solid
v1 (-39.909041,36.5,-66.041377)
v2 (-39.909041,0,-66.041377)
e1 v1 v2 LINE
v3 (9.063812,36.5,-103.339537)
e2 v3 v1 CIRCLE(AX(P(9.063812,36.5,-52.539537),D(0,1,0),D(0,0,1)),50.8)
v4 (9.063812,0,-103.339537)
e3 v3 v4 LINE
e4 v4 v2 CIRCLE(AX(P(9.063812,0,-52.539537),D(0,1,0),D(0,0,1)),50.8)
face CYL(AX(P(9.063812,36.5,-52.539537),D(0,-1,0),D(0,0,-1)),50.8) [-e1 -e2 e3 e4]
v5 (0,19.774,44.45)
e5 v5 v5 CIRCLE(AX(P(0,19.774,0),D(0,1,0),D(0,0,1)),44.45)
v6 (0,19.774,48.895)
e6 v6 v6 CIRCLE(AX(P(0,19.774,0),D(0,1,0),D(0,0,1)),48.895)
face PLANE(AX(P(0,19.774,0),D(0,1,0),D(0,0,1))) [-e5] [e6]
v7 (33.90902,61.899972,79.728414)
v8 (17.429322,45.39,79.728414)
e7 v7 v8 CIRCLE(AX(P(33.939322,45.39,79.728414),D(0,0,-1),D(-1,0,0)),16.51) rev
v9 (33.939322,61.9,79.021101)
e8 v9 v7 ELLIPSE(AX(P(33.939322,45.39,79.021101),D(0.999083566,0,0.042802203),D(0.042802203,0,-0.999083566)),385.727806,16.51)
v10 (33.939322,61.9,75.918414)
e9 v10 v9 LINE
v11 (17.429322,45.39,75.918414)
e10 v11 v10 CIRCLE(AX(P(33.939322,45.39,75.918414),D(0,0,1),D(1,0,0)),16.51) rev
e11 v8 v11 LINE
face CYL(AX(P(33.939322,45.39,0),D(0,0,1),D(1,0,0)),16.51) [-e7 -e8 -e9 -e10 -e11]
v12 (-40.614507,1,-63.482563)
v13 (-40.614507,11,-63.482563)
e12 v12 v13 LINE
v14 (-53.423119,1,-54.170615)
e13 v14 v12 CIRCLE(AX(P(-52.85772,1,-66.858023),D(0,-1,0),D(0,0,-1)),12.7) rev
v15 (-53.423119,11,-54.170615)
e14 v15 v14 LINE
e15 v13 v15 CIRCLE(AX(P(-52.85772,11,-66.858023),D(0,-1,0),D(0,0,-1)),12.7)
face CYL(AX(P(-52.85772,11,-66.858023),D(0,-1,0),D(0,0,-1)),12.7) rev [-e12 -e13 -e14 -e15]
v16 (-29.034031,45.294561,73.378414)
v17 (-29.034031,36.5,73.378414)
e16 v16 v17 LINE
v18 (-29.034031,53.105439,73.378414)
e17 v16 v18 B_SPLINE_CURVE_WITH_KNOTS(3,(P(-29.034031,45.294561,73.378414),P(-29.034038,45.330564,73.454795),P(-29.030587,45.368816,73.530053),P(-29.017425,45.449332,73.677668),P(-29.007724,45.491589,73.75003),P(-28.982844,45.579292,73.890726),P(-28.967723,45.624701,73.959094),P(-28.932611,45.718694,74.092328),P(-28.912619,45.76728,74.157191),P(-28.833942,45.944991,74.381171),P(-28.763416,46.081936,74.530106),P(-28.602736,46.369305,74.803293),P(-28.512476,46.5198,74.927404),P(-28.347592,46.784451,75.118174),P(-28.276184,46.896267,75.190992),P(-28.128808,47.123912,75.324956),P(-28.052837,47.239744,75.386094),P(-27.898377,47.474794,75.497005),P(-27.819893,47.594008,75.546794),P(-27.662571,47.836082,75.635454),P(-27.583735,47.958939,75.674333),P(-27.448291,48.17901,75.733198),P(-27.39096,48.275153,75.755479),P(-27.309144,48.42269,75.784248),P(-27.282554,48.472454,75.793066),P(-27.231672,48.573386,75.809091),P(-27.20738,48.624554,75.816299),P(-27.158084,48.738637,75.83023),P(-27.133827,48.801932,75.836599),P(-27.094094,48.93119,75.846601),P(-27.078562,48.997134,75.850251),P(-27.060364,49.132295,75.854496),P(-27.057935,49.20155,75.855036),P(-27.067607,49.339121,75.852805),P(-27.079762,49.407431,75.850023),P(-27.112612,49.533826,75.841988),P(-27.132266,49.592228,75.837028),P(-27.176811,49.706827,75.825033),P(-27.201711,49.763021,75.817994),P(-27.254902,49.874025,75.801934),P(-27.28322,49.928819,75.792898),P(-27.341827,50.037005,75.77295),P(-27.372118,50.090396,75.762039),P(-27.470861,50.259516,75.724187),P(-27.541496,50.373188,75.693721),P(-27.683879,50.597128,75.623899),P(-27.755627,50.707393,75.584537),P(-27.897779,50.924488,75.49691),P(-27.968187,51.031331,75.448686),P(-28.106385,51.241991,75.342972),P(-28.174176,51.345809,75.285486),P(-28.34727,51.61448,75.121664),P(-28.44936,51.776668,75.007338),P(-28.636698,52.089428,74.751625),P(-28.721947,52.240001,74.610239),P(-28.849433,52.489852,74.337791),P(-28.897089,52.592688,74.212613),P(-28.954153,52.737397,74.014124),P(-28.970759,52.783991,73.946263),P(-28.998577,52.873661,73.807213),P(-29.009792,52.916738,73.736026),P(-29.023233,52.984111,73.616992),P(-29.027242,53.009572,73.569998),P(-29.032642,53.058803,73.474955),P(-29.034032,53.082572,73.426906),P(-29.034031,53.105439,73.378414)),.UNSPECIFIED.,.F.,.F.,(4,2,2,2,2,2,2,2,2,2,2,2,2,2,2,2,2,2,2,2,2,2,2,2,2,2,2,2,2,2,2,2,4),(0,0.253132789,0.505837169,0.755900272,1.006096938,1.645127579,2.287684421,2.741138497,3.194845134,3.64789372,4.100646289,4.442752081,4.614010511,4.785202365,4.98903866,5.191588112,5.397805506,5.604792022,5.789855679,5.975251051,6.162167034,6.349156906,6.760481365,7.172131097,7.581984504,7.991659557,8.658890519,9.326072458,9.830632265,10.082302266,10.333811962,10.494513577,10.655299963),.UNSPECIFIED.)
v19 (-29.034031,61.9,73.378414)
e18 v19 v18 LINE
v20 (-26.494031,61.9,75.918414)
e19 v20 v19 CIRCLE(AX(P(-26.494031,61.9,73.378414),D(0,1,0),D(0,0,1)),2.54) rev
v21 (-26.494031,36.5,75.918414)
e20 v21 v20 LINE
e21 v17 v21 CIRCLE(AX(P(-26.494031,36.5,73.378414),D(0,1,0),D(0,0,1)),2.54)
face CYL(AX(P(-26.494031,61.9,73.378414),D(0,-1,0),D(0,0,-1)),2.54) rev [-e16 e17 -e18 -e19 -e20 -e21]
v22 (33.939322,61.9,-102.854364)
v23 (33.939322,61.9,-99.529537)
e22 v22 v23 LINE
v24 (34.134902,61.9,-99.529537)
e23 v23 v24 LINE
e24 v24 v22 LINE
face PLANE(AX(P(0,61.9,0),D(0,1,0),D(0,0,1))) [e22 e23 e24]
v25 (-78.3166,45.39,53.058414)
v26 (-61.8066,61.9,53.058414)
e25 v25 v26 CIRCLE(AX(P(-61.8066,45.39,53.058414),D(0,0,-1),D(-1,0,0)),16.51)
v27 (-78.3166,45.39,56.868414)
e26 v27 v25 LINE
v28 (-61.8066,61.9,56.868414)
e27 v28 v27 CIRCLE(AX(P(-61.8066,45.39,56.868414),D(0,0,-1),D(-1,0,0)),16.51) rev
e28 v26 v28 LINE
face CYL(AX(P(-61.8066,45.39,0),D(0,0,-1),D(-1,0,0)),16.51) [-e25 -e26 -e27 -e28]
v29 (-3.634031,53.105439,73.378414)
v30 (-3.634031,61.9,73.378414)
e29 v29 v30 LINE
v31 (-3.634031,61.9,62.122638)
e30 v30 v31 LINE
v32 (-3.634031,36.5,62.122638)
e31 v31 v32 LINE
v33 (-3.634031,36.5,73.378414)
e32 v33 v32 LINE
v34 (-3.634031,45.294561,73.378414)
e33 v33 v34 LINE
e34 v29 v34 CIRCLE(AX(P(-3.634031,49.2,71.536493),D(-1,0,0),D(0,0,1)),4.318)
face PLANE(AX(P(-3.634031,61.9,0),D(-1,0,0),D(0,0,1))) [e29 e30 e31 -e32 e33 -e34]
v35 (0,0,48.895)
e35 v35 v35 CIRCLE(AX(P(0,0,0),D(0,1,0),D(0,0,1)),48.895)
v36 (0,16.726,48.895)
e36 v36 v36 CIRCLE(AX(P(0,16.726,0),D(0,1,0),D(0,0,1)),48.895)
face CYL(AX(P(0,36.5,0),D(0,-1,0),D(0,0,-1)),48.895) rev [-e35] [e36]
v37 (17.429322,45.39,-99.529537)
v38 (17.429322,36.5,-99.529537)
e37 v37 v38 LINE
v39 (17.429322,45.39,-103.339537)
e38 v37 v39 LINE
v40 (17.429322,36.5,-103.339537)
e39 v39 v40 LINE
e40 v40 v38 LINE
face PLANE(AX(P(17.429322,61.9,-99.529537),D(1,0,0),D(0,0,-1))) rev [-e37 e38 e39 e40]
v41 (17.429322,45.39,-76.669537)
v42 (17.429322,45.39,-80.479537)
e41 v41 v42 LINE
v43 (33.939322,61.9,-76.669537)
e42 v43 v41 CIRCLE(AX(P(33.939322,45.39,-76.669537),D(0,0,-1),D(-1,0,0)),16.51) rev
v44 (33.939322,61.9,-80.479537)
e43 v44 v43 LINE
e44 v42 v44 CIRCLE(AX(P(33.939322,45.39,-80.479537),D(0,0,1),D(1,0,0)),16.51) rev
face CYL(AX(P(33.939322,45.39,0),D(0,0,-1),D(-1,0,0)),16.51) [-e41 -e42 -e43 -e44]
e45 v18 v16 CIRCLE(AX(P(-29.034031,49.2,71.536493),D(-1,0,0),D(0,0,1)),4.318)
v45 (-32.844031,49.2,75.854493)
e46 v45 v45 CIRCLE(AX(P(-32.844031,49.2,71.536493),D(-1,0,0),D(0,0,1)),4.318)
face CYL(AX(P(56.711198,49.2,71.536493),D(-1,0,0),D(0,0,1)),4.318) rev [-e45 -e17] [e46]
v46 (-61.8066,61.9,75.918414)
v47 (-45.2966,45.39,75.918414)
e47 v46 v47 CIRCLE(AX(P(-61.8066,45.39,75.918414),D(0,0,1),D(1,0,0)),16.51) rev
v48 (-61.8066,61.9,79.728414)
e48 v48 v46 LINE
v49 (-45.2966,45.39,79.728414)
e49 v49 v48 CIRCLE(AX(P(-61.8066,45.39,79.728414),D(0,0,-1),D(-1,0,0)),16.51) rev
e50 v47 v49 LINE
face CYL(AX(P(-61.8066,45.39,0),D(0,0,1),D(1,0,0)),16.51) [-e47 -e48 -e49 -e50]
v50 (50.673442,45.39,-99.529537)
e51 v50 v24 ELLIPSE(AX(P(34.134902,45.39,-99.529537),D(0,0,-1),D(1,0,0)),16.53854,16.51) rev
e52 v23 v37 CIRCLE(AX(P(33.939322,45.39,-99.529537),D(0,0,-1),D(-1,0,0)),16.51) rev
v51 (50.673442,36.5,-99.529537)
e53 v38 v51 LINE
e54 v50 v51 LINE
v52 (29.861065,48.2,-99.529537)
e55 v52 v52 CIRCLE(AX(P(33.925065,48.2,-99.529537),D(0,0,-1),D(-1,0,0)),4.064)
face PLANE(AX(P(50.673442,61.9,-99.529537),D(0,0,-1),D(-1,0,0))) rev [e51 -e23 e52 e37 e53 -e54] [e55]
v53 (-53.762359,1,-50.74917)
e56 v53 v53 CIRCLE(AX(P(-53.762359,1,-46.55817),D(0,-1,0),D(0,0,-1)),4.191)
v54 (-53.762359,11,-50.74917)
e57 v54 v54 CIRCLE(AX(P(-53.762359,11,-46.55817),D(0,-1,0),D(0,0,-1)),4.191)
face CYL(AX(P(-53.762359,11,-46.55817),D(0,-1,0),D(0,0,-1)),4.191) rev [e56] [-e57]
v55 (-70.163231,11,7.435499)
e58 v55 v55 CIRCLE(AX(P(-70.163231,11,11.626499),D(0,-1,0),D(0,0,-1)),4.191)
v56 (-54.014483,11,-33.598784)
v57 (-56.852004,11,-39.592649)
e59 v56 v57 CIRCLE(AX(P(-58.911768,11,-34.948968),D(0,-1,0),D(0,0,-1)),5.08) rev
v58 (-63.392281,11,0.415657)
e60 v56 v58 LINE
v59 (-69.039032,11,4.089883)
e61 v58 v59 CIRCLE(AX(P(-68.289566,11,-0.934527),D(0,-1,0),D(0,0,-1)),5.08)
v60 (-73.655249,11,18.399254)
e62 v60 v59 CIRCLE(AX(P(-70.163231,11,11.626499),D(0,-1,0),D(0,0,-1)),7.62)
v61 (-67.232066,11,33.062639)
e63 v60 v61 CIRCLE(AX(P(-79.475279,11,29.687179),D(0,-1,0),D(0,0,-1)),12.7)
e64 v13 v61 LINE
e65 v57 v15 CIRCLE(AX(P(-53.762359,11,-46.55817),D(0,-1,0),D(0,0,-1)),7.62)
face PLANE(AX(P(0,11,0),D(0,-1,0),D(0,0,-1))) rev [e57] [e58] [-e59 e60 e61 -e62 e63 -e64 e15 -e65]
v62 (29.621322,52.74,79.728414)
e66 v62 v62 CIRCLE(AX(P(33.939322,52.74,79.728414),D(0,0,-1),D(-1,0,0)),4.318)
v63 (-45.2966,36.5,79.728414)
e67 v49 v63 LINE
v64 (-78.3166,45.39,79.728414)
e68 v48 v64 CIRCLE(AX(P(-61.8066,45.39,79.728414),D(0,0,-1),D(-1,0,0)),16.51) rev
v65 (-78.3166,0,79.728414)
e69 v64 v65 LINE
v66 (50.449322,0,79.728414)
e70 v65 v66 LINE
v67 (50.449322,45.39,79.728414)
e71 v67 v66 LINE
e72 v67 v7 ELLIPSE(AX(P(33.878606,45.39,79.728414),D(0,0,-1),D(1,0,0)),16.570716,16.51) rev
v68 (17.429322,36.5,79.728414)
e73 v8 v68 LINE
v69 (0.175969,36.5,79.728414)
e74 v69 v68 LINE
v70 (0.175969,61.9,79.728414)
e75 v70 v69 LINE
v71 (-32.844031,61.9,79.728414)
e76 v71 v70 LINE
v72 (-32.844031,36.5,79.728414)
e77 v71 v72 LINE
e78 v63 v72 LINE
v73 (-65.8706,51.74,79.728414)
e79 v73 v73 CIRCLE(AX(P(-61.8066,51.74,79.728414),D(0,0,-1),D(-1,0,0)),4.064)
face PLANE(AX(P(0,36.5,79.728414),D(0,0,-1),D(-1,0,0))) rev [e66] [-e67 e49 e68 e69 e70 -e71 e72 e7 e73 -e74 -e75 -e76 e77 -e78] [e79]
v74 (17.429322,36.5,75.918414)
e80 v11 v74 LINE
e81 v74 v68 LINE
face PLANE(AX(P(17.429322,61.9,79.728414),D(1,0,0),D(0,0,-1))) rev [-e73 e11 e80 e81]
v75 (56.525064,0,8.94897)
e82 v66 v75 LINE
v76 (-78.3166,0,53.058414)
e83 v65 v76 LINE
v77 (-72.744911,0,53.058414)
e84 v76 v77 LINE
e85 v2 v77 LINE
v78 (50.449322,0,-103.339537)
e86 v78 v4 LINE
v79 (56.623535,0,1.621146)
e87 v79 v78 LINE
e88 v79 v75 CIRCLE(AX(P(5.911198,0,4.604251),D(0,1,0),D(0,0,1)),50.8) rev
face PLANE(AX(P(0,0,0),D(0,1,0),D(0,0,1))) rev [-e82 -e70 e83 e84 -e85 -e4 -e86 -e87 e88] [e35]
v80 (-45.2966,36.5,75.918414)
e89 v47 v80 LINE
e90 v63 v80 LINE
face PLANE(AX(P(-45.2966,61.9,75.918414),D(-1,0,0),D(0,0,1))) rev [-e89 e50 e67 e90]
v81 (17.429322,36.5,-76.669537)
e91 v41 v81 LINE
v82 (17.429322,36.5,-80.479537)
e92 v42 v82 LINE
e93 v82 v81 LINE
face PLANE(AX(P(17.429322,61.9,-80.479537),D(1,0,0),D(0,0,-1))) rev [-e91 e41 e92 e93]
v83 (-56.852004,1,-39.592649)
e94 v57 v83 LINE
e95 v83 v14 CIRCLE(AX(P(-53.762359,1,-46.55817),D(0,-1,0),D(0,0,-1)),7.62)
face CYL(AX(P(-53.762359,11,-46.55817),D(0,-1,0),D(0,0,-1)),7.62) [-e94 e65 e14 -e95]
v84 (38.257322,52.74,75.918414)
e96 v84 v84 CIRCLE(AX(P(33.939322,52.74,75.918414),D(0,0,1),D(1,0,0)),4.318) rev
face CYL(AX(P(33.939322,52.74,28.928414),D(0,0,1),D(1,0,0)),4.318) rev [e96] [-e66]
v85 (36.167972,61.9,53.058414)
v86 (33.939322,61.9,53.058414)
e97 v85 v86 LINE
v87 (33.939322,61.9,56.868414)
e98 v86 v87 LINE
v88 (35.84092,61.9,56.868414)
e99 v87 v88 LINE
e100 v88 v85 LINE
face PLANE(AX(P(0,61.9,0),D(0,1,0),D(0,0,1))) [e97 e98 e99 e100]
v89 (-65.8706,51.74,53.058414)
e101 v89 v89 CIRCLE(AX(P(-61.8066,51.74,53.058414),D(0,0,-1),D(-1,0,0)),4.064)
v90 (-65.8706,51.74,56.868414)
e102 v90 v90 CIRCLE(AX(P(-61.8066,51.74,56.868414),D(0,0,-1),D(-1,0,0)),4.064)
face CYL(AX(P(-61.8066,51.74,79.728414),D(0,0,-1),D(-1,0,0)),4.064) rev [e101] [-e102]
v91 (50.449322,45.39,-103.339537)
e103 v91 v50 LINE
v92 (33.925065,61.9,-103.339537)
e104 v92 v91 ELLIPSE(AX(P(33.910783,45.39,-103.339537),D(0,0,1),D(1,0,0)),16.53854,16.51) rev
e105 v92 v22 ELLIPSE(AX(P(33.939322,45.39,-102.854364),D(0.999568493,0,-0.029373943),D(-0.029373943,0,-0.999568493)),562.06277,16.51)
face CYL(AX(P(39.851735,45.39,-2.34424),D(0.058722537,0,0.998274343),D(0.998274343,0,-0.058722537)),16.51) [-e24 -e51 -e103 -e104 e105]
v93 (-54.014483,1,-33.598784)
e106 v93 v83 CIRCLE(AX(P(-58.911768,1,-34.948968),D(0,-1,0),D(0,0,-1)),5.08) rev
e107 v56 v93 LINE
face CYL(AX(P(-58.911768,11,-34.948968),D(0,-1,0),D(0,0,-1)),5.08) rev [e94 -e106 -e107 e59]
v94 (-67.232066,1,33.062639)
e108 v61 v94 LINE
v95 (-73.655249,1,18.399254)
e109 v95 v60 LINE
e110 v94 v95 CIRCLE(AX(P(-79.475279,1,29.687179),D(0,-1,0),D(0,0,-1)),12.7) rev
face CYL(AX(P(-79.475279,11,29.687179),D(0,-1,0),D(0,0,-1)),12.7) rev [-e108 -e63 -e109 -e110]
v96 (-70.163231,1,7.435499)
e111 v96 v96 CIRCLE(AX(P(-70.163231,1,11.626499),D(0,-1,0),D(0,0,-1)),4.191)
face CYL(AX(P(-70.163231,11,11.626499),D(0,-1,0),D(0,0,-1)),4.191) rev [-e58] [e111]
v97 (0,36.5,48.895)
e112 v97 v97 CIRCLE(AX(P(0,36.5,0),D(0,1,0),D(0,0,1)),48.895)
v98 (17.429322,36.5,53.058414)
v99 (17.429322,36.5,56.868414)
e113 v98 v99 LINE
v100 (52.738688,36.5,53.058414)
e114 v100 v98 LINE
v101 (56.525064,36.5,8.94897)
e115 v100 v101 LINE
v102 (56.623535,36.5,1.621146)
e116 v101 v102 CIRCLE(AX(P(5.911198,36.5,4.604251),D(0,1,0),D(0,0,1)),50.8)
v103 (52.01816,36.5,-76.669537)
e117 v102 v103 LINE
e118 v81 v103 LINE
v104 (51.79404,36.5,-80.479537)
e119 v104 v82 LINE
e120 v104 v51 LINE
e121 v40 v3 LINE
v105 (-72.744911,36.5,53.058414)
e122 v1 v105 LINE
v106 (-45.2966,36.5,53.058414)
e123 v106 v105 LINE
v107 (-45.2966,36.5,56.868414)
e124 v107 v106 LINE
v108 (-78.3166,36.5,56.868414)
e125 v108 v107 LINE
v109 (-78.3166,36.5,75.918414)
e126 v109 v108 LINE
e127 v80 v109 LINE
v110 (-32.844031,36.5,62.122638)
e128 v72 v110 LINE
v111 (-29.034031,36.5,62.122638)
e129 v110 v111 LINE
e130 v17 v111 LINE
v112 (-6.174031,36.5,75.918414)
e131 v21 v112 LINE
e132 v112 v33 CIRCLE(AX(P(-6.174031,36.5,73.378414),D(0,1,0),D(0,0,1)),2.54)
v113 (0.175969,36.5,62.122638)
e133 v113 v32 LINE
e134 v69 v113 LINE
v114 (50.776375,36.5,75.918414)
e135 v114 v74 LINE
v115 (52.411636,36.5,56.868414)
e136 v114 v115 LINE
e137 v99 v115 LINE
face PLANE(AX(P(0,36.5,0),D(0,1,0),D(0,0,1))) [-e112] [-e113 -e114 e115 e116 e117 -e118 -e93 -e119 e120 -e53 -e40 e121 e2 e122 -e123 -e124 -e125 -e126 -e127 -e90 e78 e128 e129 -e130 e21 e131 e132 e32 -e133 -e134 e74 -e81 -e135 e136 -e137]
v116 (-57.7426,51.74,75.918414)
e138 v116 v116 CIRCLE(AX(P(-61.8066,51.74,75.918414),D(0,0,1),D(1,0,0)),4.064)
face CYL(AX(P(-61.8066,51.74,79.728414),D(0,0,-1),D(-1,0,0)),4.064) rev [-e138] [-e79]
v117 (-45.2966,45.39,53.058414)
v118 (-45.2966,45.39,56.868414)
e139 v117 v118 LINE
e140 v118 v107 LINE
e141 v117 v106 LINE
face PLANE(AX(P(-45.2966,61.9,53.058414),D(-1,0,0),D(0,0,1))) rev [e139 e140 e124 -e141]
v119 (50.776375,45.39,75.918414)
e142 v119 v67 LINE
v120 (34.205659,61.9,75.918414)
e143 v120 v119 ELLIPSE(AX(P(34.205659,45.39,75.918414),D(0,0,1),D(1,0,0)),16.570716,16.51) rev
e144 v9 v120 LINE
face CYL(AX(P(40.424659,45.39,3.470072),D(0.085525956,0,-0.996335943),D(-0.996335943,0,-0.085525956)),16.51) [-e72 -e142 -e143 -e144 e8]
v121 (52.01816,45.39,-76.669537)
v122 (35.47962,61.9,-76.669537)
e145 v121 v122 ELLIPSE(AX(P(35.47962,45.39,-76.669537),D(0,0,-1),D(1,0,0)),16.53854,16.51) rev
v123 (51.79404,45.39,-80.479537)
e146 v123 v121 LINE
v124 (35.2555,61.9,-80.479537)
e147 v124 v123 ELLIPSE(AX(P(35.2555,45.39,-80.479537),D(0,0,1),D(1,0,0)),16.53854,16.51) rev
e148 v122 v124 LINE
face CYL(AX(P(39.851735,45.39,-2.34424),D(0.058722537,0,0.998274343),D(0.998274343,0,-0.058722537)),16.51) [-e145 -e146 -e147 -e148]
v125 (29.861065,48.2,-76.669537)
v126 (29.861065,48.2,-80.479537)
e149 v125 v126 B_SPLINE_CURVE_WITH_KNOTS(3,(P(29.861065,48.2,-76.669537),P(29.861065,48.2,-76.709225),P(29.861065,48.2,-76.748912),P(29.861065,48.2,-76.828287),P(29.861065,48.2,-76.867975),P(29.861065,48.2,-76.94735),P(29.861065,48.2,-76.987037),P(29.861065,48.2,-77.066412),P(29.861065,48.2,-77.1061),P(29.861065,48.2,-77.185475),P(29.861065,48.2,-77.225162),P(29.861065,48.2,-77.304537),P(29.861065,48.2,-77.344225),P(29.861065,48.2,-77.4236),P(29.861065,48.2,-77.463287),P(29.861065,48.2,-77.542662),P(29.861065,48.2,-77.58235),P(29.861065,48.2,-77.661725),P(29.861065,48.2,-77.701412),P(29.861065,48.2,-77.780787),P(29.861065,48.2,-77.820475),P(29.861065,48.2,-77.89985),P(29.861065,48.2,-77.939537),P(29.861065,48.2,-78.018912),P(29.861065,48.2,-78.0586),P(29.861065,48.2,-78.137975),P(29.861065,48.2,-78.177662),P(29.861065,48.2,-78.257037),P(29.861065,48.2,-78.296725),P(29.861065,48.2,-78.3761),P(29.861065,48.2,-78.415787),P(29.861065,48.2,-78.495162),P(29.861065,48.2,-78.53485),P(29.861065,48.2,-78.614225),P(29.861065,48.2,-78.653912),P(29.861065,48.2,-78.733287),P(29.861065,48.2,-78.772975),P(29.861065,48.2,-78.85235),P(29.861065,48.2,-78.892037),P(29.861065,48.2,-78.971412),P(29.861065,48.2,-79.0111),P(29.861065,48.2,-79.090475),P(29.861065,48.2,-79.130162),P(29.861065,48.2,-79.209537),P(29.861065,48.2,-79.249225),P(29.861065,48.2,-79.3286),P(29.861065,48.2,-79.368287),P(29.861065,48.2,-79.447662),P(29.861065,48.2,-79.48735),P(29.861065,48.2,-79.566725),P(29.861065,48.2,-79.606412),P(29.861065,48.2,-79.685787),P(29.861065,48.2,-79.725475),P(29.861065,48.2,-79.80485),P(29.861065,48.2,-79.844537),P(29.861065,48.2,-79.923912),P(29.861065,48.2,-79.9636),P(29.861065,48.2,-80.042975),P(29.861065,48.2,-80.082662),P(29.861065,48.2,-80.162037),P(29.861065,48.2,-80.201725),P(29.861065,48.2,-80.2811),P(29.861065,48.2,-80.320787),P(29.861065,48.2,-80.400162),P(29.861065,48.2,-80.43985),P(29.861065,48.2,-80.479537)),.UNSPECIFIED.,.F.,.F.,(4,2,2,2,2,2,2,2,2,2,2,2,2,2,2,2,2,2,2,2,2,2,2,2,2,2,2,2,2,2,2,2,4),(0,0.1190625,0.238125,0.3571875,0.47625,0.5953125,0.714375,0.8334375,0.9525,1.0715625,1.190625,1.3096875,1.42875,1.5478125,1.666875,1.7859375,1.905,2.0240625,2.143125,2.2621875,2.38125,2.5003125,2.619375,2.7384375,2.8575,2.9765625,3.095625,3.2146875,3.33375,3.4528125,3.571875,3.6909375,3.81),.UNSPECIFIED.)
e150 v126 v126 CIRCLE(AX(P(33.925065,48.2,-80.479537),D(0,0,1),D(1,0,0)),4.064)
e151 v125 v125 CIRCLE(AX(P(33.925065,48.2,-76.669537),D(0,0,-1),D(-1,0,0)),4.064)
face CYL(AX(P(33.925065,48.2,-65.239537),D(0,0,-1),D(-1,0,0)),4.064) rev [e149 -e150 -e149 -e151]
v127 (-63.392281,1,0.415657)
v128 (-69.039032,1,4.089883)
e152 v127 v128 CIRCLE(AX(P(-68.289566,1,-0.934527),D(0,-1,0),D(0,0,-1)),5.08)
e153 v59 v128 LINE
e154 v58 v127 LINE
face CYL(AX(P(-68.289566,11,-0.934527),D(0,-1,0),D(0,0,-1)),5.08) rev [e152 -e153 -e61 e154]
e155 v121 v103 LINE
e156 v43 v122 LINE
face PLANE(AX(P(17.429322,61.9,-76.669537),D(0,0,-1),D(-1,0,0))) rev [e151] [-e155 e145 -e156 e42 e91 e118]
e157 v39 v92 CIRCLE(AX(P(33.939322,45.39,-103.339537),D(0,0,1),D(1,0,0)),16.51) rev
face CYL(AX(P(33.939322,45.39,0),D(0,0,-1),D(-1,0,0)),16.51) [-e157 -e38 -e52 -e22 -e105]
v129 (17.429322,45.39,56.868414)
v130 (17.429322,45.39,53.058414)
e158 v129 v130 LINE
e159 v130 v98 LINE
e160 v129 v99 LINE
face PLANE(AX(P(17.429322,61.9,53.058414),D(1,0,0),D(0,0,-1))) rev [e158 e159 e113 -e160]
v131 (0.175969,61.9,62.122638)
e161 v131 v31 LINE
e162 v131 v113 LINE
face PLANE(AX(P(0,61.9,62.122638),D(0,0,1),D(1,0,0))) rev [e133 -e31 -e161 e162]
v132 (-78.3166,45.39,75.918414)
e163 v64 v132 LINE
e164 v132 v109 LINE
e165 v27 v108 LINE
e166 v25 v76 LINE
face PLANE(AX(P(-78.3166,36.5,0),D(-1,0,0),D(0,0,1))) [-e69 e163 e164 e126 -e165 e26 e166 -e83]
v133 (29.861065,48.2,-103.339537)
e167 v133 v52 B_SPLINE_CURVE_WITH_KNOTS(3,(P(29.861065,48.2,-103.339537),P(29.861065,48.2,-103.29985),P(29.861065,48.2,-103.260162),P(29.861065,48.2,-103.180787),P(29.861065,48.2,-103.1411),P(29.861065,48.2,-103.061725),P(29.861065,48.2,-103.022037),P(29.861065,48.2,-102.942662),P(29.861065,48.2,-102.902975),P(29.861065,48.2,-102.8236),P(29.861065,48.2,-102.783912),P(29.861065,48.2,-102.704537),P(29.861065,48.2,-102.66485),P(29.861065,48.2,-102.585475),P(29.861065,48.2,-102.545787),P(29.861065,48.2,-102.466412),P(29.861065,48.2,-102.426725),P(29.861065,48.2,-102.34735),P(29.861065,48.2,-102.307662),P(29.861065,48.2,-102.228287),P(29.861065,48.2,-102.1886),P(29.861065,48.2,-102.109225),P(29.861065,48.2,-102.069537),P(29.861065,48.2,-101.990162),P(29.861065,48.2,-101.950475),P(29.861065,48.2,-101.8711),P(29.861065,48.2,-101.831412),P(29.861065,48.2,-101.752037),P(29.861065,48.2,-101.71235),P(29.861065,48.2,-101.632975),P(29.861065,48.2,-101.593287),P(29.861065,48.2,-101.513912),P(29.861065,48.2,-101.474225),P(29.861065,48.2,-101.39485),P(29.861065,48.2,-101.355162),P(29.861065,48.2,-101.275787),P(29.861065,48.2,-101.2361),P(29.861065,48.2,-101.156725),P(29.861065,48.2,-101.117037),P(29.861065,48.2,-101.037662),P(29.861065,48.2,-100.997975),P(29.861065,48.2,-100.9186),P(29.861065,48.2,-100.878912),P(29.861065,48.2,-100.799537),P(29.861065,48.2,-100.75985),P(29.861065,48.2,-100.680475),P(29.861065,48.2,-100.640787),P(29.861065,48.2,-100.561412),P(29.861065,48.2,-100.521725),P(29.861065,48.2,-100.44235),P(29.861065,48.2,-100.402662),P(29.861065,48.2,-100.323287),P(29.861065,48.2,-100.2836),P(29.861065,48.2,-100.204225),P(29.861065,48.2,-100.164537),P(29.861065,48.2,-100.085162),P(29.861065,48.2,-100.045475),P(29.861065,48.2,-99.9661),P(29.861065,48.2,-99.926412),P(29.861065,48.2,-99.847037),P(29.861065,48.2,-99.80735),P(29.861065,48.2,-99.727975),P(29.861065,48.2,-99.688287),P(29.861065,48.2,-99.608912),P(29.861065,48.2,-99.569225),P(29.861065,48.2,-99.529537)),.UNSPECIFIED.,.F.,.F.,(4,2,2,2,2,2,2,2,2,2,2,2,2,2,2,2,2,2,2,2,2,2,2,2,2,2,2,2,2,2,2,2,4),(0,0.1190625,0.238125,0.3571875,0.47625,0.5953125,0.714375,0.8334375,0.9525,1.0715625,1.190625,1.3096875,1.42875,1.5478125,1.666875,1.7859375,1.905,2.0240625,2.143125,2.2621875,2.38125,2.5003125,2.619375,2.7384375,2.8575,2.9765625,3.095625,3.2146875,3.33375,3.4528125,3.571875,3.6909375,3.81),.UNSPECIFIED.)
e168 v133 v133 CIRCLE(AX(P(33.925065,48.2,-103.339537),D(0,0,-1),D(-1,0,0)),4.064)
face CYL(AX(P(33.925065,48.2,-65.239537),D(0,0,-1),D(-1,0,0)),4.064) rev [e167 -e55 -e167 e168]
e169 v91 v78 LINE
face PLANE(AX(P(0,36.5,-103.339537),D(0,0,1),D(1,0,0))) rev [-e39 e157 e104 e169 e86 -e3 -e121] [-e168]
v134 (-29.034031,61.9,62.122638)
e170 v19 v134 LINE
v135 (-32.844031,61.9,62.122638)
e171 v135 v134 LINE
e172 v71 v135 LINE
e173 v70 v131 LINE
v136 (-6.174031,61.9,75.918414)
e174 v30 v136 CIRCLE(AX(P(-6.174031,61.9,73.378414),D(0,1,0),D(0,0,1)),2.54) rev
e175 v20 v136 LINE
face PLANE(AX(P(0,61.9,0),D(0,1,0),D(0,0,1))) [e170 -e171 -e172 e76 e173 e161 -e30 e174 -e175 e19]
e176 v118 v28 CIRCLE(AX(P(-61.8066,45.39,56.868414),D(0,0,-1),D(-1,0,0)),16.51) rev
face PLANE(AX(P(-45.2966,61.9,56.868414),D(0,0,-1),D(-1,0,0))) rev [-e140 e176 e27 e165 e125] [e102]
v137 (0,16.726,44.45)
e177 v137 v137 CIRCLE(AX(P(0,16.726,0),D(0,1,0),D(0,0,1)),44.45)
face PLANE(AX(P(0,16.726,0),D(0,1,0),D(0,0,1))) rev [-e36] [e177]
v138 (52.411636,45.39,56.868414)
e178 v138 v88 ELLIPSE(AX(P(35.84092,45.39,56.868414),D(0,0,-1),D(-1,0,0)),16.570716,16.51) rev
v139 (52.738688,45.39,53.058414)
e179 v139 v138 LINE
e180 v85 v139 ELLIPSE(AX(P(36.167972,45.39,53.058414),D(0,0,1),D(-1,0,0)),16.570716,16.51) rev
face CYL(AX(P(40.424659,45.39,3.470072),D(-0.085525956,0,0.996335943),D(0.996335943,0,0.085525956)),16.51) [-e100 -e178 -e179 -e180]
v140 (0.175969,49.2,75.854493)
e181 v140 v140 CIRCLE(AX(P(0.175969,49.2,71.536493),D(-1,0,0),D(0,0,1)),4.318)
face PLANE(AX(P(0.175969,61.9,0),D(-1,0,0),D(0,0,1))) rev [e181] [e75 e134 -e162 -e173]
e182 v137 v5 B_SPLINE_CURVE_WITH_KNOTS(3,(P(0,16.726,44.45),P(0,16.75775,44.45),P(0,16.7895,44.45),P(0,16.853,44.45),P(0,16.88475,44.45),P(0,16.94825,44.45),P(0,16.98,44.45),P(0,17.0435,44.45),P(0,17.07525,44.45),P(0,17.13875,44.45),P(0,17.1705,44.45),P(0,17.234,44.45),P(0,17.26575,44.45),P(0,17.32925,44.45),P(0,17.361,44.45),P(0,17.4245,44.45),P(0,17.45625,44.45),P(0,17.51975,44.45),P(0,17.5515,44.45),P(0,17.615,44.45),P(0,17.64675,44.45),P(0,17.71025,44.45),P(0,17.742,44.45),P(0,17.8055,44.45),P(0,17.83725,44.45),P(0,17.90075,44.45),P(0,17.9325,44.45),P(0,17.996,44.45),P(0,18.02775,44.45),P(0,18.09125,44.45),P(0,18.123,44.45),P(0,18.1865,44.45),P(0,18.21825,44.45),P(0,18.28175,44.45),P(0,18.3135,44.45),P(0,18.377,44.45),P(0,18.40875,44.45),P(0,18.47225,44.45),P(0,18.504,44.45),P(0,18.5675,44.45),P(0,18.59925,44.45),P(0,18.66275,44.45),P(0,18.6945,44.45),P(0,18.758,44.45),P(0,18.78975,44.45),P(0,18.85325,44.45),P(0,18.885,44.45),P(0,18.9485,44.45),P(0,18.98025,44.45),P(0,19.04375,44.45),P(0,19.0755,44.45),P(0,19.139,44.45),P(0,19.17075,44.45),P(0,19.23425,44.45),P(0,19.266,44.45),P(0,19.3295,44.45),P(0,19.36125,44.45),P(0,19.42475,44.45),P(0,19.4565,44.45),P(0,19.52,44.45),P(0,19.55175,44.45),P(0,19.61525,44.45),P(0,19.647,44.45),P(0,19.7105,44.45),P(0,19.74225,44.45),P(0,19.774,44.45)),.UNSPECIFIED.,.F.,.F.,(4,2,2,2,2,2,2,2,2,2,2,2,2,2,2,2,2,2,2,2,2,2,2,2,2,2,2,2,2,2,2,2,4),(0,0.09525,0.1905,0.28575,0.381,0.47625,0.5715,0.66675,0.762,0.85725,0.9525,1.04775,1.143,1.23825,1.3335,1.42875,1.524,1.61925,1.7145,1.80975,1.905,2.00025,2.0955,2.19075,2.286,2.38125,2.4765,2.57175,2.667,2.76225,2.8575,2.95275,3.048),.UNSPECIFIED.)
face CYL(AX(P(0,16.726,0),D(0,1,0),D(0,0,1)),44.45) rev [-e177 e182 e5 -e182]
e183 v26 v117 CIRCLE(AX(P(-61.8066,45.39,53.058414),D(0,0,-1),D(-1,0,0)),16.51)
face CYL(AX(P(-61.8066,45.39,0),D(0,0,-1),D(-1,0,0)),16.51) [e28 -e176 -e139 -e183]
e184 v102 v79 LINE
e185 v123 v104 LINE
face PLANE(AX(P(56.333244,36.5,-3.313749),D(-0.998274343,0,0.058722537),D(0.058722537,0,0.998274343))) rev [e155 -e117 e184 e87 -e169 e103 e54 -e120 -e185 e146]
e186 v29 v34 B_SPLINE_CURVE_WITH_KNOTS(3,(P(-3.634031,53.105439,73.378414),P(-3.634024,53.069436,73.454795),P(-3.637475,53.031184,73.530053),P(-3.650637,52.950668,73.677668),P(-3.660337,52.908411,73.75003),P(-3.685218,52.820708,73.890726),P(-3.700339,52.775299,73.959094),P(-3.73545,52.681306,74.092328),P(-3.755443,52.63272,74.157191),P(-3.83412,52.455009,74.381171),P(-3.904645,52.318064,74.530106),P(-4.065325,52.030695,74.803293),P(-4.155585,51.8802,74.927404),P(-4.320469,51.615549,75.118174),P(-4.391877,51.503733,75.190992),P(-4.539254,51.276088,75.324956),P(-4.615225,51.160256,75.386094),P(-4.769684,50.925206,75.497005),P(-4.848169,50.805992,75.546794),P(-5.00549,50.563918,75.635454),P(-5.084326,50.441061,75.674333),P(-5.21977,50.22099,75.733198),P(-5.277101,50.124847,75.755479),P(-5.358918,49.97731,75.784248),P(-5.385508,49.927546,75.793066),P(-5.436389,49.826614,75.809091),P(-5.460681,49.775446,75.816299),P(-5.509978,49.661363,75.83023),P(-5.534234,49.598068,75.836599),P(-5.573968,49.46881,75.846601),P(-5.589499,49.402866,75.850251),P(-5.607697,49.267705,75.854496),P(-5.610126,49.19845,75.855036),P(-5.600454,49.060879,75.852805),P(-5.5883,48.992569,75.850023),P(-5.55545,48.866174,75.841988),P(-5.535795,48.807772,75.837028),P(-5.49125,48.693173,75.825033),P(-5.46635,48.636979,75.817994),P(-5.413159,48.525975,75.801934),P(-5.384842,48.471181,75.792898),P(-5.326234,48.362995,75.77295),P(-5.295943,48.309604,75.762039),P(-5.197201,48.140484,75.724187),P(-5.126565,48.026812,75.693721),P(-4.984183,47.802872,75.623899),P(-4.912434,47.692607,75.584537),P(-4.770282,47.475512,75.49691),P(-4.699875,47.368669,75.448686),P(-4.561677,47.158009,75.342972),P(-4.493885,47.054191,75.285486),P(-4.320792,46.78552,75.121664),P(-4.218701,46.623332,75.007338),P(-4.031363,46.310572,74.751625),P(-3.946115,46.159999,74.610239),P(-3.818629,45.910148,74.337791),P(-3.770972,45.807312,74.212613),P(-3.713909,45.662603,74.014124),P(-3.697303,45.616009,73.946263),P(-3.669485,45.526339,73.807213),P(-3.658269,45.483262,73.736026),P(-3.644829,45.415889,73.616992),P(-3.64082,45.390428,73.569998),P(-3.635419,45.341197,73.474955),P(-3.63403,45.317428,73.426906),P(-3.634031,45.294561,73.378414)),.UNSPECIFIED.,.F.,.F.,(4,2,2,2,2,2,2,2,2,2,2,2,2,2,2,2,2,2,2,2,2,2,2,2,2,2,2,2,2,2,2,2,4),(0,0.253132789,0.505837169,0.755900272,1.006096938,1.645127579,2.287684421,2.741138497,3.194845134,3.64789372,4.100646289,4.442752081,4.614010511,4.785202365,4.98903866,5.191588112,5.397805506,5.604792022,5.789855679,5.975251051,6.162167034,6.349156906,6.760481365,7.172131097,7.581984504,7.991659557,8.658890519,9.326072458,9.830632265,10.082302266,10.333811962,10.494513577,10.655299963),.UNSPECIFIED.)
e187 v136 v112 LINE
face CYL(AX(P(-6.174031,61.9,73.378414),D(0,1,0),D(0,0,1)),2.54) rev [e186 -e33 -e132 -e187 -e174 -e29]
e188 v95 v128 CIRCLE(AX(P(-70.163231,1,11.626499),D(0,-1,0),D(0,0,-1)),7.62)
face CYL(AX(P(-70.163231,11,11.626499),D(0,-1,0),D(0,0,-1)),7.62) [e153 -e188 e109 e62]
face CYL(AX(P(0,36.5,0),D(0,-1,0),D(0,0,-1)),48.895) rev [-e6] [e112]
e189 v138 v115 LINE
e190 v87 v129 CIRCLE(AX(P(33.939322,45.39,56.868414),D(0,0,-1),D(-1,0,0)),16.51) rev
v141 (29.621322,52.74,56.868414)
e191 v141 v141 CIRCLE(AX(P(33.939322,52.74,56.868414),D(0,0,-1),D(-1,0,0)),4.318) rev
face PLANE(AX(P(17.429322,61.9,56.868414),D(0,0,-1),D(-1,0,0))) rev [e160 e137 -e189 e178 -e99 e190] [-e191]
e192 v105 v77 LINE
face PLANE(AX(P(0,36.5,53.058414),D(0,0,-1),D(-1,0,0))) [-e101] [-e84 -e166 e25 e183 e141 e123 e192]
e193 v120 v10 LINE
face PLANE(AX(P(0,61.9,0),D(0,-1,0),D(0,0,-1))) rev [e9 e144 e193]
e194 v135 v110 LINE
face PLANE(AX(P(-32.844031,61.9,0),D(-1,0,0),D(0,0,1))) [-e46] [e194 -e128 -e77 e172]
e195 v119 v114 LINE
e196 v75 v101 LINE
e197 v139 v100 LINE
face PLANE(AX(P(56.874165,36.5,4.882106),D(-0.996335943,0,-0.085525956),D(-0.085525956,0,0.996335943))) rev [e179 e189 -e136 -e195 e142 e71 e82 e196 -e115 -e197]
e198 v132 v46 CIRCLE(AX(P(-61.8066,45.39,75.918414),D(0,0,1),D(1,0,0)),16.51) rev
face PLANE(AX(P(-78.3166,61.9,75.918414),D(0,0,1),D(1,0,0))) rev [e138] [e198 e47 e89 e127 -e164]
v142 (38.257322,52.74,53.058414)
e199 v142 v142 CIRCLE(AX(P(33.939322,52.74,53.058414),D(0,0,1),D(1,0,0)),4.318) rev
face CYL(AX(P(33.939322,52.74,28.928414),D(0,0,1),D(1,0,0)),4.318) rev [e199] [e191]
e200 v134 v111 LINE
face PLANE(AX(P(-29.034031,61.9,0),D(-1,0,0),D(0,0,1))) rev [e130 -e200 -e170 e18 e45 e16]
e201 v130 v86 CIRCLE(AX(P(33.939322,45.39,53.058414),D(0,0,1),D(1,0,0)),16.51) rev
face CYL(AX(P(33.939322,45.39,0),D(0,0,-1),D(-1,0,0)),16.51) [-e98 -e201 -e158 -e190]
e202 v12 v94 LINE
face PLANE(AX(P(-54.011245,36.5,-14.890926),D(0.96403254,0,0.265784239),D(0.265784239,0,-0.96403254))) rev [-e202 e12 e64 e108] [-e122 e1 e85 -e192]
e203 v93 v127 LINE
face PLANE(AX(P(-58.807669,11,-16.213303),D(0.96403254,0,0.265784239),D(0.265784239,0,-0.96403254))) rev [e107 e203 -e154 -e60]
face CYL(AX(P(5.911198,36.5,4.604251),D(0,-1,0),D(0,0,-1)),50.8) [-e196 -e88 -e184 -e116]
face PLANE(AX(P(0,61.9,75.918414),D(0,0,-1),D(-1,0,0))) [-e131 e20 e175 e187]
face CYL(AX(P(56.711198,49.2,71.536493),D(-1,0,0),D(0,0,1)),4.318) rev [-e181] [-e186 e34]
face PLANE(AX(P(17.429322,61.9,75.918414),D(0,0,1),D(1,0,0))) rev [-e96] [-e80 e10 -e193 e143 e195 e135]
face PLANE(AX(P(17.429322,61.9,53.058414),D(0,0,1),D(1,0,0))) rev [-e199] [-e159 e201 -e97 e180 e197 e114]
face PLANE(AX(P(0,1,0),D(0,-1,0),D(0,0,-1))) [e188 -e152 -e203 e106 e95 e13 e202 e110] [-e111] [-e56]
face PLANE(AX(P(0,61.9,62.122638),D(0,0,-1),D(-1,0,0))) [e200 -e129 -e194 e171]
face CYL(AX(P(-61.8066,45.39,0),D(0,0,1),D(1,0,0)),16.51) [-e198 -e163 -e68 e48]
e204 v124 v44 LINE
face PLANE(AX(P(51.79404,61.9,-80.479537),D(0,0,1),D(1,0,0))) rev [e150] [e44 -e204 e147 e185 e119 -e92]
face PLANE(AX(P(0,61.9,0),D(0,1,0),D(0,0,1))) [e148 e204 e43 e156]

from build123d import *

# Parameters (mm, degrees)
SKETCH1_R                      = 48.895
BASE_DEPTH                     = 36.5
SKETCH2_W                      = 33.019999999999996
SKETCH2_H                      = 3.8100000000000023
A_ARMS_DEPTH                   = 25.4
FILLET_A_ARM_TAB_F_R           = 16.51
FILLET2_R                      = 50.8
SKETCH3_R                      = 4.191000000000014
SKETCH3_R_2                    = 4.190999999999996
BOSS_EXTRUDE3_DEPTH            = 10
FILLET3_R                      = 12.7
SKETCH6_R                      = 4.063999999999998
TAB_HOLES_1_DEPTH              = 38.1
SKETCH7_R                      = 4.064000000000002
TAB_HOLES_2_DEPTH              = 186.5408819792208
MID_FEATURE_BEARING_DEPTH      = 1.524
MID_FEATURE_BEARING_DEPTH_BACK = 1.524
SKETCH8_R                      = 48.895
SKETCH8_R_2                    = 44.449999999999996
SKETCH9_W                      = 3.8100000000000023
SKETCH9_H                      = 13.79577582478543
BOSS_EXTRUDE5_DEPTH            = 25.4
PUSHROD_STR_R                  = 2.54
SKETCH10_R                     = 4.318000000000003
PUSHROD_HOLES_DEPTH            = 151.10266140654986
SKETCH11_R                     = 4.317999999999998
TAB_HOLES_3_DEPTH              = 50.8


with BuildPart() as part:
    # Sketch1 → Base (new body)
    with BuildSketch(Plane(origin=(0, 0, 0), x_dir=(1, 0, 0), z_dir=(0, 1, 0))):
        with BuildLine():
            Line((-78.31659997030465, -79.72841359803415), (50.449322454190956, -79.72841359803415))
            Line((50.449322454190956, -79.72841359803415), (56.83927020061317, -5.288618846495341))
            Line((56.83927020061317, -5.288618846495341), (50.449322454190956, 103.33953733073578))
            Line((50.449322454190956, 103.33953733073578), (9.063812231160846, 103.33953733073578))
            ThreePointArc((9.063812231160846, 103.33953733073578), (-21.715617266777734, 92.95323203663254), (-39.90904079842039, 66.04137669220931))
            Line((-39.90904079842039, 66.04137669220931), (-72.74491081630002, -53.05841359803415))
            Line((-72.74491081630002, -53.05841359803415), (-78.31659997030464, -53.05841359803415))
            Line((-78.31659997030464, -53.05841359803415), (-78.31659997030465, -79.72841359803415))
        make_face()
        with Locations(Location((0, 0, 0), (0, 0, 270))):
            Circle(SKETCH1_R, mode=Mode.SUBTRACT)
    extrude(amount=BASE_DEPTH)

    # Sketch2 → A-Arms (add)
    with BuildSketch(Plane(origin=(0, 36.5, 0), x_dir=(1, 0, 0), z_dir=(0, 1, 0))):
        Polygon((50.449322454190956, 103.3395373307358), (50.673442072627154, 99.52953733073582), (17.429322454190952, 99.52953733073582), (17.429322454190952, 103.33953733073581), align=None)
        Polygon((17.429322454190977, -75.91841359803415), (50.77637468472341, -75.91841359803415), (50.449322454190956, -79.72841359803415), (17.429322454190974, -79.72841359803415), align=None)
        Polygon((17.429322454190952, 80.47953733073582), (17.42932245419096, 76.66953733073582), (52.01815978324433, 76.66953733073582), (51.79404016480813, 80.47953733073582), align=None)
        Polygon((17.429322454190974, -53.05841359803416), (52.738688067918105, -53.058413598034164), (52.41163583738566, -56.86841359803416), (17.429322454190974, -56.86841359803416), align=None)
        Polygon((-45.296599970304655, -53.05841359803415), (-78.31659997030464, -53.05841359803415), (-78.31659997030465, -56.86841359803416), (-45.296599970304655, -56.86841359803415), align=None)
        with Locations((-61.80659997030465, -77.82341359803415)):
            Rectangle(SKETCH2_W, SKETCH2_H)
    extrude(amount=A_ARMS_DEPTH)

    # Fillet a-arm tab f
    # the kernel refuses this fillet: 16.51 mm, written as the material it takes off along each edge
    with BuildSketch(Plane(origin=(54.3064585195025, 61.9, 34.794647560383474), x_dir=(0, -1, 0), z_dir=(-0.08552595602129841, 0, 0.9963359427656131))) as fillet_a_arm_tab_f_piece_1:
        with BuildLine():
            CenterArc((FILLET_A_ARM_TAB_F_R, -FILLET_A_ARM_TAB_F_R), FILLET_A_ARM_TAB_F_R, 90, 90)
            Line((-7.11e-15, -FILLET_A_ARM_TAB_F_R), (0, 0))
            Line((0, 0), (FILLET_A_ARM_TAB_F_R, 0))
        make_face()
    extrude(amount=86.37401139662217, mode=Mode.SUBTRACT)
    with BuildSketch(Plane(origin=(56.2687719026972, 61.9, 11.93464756038351), x_dir=(-4.3e-16, -1, -4e-17), z_dir=(-0.08552595602129671, 0, 0.9963359427656132))) as fillet_a_arm_tab_f_piece_2:
        with BuildLine():
            CenterArc((FILLET_A_ARM_TAB_F_R, -FILLET_A_ARM_TAB_F_R), FILLET_A_ARM_TAB_F_R, 90.00000000000003, 89.99999999999997)
            Line((-3e-17, -FILLET_A_ARM_TAB_F_R), (0, 0))
            Line((0, 0), (FILLET_A_ARM_TAB_F_R, 0))
        make_face()
    extrude(amount=86.37401139662215, mode=Mode.SUBTRACT)
    with BuildSketch(Plane(origin=(17.429322454190935, 61.9, 121.00341359803414), x_dir=(1, 4.3e-16, 9.3e-16), z_dir=(9.3e-16, 0, -1))) as fillet_a_arm_tab_f_piece_3:
        with BuildLine():
            CenterArc((FILLET_A_ARM_TAB_F_R, FILLET_A_ARM_TAB_F_R), FILLET_A_ARM_TAB_F_R, 180.00000000000003, 90)
            Line((-1.421e-14, FILLET_A_ARM_TAB_F_R), (0, 0))
            Line((0, 0), (FILLET_A_ARM_TAB_F_R, 0))
        make_face()
    extrude(amount=86.35999999999999, mode=Mode.SUBTRACT)
    with BuildSketch(Plane(origin=(17.429322454190974, 61.9, 98.14341359803416), x_dir=(-2.2e-16, -1, 0), z_dir=(0, 0, -1))) as fillet_a_arm_tab_f_piece_4:
        with BuildLine():
            CenterArc((FILLET_A_ARM_TAB_F_R, -FILLET_A_ARM_TAB_F_R), FILLET_A_ARM_TAB_F_R, 89.99999999999999, 90.00000000000001)
            Line((-1.066e-14, -FILLET_A_ARM_TAB_F_R), (0, 0))
            Line((0, 0), (FILLET_A_ARM_TAB_F_R, 0))
        make_face()
    extrude(amount=86.35999999999999, mode=Mode.SUBTRACT)
    with BuildSketch(Plane(origin=(54.44193248550869, 61.9, -35.46576382772086), x_dir=(3e-17, -1, 0), z_dir=(-0.05872253669931843, 0, -0.9982743428955776))) as fillet_a_arm_tab_f_piece_5:
        with BuildLine():
            CenterArc((FILLET_A_ARM_TAB_F_R, FILLET_A_ARM_TAB_F_R), FILLET_A_ARM_TAB_F_R, 180, 90)
            Line((-7.52e-15, FILLET_A_ARM_TAB_F_R), (0, 0))
            Line((0, 0), (FILLET_A_ARM_TAB_F_R, 0))
        make_face()
    extrude(amount=86.36658611895079, mode=Mode.SUBTRACT)
    with BuildSketch(Plane(origin=(48.025549751926604, 61.9, -144.54331083375075), x_dir=(-0.9982743428955775, 0, 0.05872253669931885), z_dir=(0.058722536699318865, 0, 0.9982743428955776))) as fillet_a_arm_tab_f_piece_6:
        with BuildLine():
            CenterArc((FILLET_A_ARM_TAB_F_R, FILLET_A_ARM_TAB_F_R), FILLET_A_ARM_TAB_F_R, 180.00000000000003, 90)
            Line((-8.77e-15, FILLET_A_ARM_TAB_F_R), (0, 0))
            Line((0, 0), (FILLET_A_ARM_TAB_F_R, 0))
        make_face()
    extrude(amount=86.36658611895078, mode=Mode.SUBTRACT)
    with BuildSketch(Plane(origin=(17.429322454190874, 61.9, -121.75453733073583), x_dir=(-2.2e-16, -1, 0), z_dir=(1.86e-15, 0, 1))) as fillet_a_arm_tab_f_piece_7:
        with BuildLine():
            CenterArc((FILLET_A_ARM_TAB_F_R, FILLET_A_ARM_TAB_F_R), FILLET_A_ARM_TAB_F_R, 180, 90)
            Line((-1.066e-14, FILLET_A_ARM_TAB_F_R), (0, 0))
            Line((0, 0), (FILLET_A_ARM_TAB_F_R, 0))
        make_face()
    extrude(amount=86.36000000000001, mode=Mode.SUBTRACT)
    with BuildSketch(Plane(origin=(17.429322454190952, 61.900000000000006, -58.25453733073583), x_dir=(2.2e-16, -1, 0), z_dir=(0, 0, -1))) as fillet_a_arm_tab_f_piece_8:
        with BuildLine():
            CenterArc((FILLET_A_ARM_TAB_F_R, -FILLET_A_ARM_TAB_F_R), FILLET_A_ARM_TAB_F_R, 90.00000000000001, 89.99999999999999)
            Line((3.55e-15, -FILLET_A_ARM_TAB_F_R), (0, 0))
            Line((0, 0), (FILLET_A_ARM_TAB_F_R, 0))
        make_face()
    extrude(amount=86.35999999999997, mode=Mode.SUBTRACT)
    with BuildSketch(Plane(origin=(-78.31659997030468, 61.9, 121.00341359803414), x_dir=(1, 4.3e-16, 0), z_dir=(0, 0, -1))) as fillet_a_arm_tab_f_piece_9:
        with BuildLine():
            CenterArc((FILLET_A_ARM_TAB_F_R, FILLET_A_ARM_TAB_F_R), FILLET_A_ARM_TAB_F_R, 180.00000000000003, 90)
            Line((-7.11e-15, FILLET_A_ARM_TAB_F_R), (0, 0))
            Line((0, 0), (FILLET_A_ARM_TAB_F_R, 0))
        make_face()
    extrude(amount=86.35999999999999, mode=Mode.SUBTRACT)
    with BuildSketch(Plane(origin=(-45.296599970304655, 61.900000000000006, 34.64341359803416), x_dir=(0, -1, 0), z_dir=(0, 0, 1))) as fillet_a_arm_tab_f_piece_10:
        with BuildLine():
            CenterArc((FILLET_A_ARM_TAB_F_R, -FILLET_A_ARM_TAB_F_R), FILLET_A_ARM_TAB_F_R, 90, 89.99999999999997)
            Line((0, -FILLET_A_ARM_TAB_F_R), (0, 0))
            Line((0, 0), (FILLET_A_ARM_TAB_F_R, 0))
        make_face()
    extrude(amount=86.35999999999999, mode=Mode.SUBTRACT)
    with BuildSketch(Plane(origin=(-45.296599970304655, 61.9, 98.14341359803416), x_dir=(-1, 4.3e-16, 0), z_dir=(0, 0, -1))) as fillet_a_arm_tab_f_piece_11:
        with BuildLine():
            CenterArc((FILLET_A_ARM_TAB_F_R, -FILLET_A_ARM_TAB_F_R), FILLET_A_ARM_TAB_F_R, 89.99999999999997, 90)
            Line((-7.11e-15, -FILLET_A_ARM_TAB_F_R), (0, 0))
            Line((0, 0), (FILLET_A_ARM_TAB_F_R, 0))
        make_face()
    extrude(amount=86.35999999999999, mode=Mode.SUBTRACT)
    with BuildSketch(Plane(origin=(-78.31659997030461, 61.9, 11.783413598034159), x_dir=(1, 4.3e-16, 3.73e-15), z_dir=(-3.73e-15, 0, 1))) as fillet_a_arm_tab_f_piece_12:
        with BuildLine():
            CenterArc((FILLET_A_ARM_TAB_F_R, -FILLET_A_ARM_TAB_F_R), FILLET_A_ARM_TAB_F_R, 89.99999999999997, 90)
            Line((-7.11e-15, -FILLET_A_ARM_TAB_F_R), (0, 0))
            Line((0, 0), (FILLET_A_ARM_TAB_F_R, 0))
        make_face()
    extrude(amount=86.36, mode=Mode.SUBTRACT)

    # Fillet2
    fillet2_edges = [part.edges().sort_by_distance(p)[0] for p in [
        (56.83927020061317, 18.25, 5.288618846495341),
    ]]
    fillet(fillet2_edges, radius=FILLET2_R)

    # Sketch3 → Boss-Extrude3 (add)
    with BuildSketch(Plane(origin=(0, 1, 0), x_dir=(-1, 0, 0), z_dir=(0, -1, 0))):
        with BuildLine():
            Line((43.854458680364935, 51.73085462926094), (63.97193553589411, -21.237739574507735))
            Line((63.97193553589411, -21.23773957450774), (72.18850644780878, -18.97242698412595))
            ThreePointArc((72.18850644780878, -18.972426984125953), (77.61812906849276, -10.048878041184466), (69.03903187444669, -4.089883253871238))
            ThreePointArc((69.03903187444669, -4.089883253871242), (65.51899089441646, -3.3234432694139), (63.39228079206122, -0.41565667280690477))
            Line((63.392280792061214, -0.41565667280690377), (54.01448307558028, 33.598783657509856))
            ThreePointArc((54.01448307558028, 33.598783657509856), (54.32028306249501, 37.12259649311495), (56.85200449493394, 39.59264854133208))
            ThreePointArc((56.85200449493394, 39.59264854133208), (60.937845875450805, 49.12269396499909), (51.73708276530621, 53.904097917281604))
            Line((51.73708276530621, 53.904097917281604), (43.854458680364935, 51.73085462926094))
        make_face()
        with Locations(Location((70.16323054358774, -11.626499029688759, 0), (0, 0, 90))):
            Circle(SKETCH3_R, mode=Mode.SUBTRACT)
        with Locations(Location((53.76235866952725, 46.55816996284442, 0), (0, 0, 90))):
            Circle(SKETCH3_R_2, mode=Mode.SUBTRACT)
    extrude(amount=-BOSS_EXTRUDE3_DEPTH)

    # Fillet3
    # the kernel refuses this fillet: 12.7 mm, written as the material it adds along each edge
    with BuildSketch(Plane(origin=(-43.854458680364935, 1, -51.73085462926094), x_dir=(0.26578423939908474, 0, -0.9640325399523867), z_dir=(0, 1, 0))) as fillet3_piece_1:
        with BuildLine():
            CenterArc((12.190157430730798, 12.699999999999996), FILLET3_R, 192.86192857505063, 77.13807142494932)
            Line((-0.19119096347594106, 9.872949957769716), (-1.4293258028966136, 9.59024495354669))
            ThreePointArc((-1.4293258028966136, 9.59024495354669), (-1.269999999999986, 8.176719932431535), (-1.2699999999999998, -1.12e-15))
            Line((-1.2699999999999998, -1.12e-15), (1.13e-15, -1.2699999999999996))
            Line((1.13e-15, -1.2699999999999996), (12.190157430730789, -1.2700000000000002))
            Line((12.190157430730789, -1.2700000000000002), (12.190157430730787, -3e-17))
        make_face()
    extrude(amount=10)
    with BuildSketch(Plane(origin=(-63.97193553589411, 1, 21.237739574507735), x_dir=(-0.26578423939908663, 0, 0.9640325399523861), z_dir=(0, 1, 0))) as fillet3_piece_2:
        with BuildLine():
            CenterArc((12.266078660835335, -12.700000000000003), FILLET3_R, 90.00000000000009, 78.13802054521597)
            Line((-0.1627205021867313, -10.089453818592379), (-1.405600418488939, -9.828399200451612))
            ThreePointArc((-1.405600418488939, -9.828399200451612), (-1.2699999999999627, -8.523126109747787), (-1.2699999999999998, -3.65e-15))
            Line((-1.2699999999999998, -3.65e-15), (-2.3e-16, 1.2700000000000007))
            Line((-2.3e-16, 1.2700000000000007), (12.266078660835314, 1.2699999999999927))
            Line((12.266078660835314, 1.2699999999999927), (12.266078660835316, -2.6e-16))
        make_face()
    extrude(amount=10)

    # Sketch6 → Tab Holes 1 (cut)
    with BuildSketch(Plane(origin=(0, 0, -103.33953733073578), x_dir=(-1, 0, 0), z_dir=(0, 0, -1))):
        with Locations((-33.92506485292849, 48.199999999999996)):
            Circle(SKETCH6_R)
    extrude(amount=-TAB_HOLES_1_DEPTH, mode=Mode.SUBTRACT)

    # Sketch7 → Tab Holes 2 (cut, through all)
    with BuildSketch(Plane(origin=(0, 0, 53.05841359803415), x_dir=(-1, 0, 0), z_dir=(0, 0, -1))):
        with Locations((61.80659997030466, 51.739999999999995)):
            Circle(SKETCH7_R)
    extrude(amount=-TAB_HOLES_2_DEPTH, mode=Mode.SUBTRACT)

    # Sketch8 → mid-feature bearing (add, two sides: drawn at the far end of the back side and taken through both)
    with BuildSketch(Plane(origin=(0, 18.25, 0), x_dir=(1, 0, 0), z_dir=(0, 1, 0)).offset(-MID_FEATURE_BEARING_DEPTH_BACK)):
        with Locations(Location((0, 0, 0), (0, 0, 270))):
            Circle(SKETCH8_R)
        with Locations(Location((0, 0, 0), (0, 0, 270))):
            Circle(SKETCH8_R_2, mode=Mode.SUBTRACT)
    extrude(amount=MID_FEATURE_BEARING_DEPTH + MID_FEATURE_BEARING_DEPTH_BACK)

    # Sketch9 → Boss-Extrude5 (add)
    with BuildSketch(Plane(origin=(0, 36.5, 0), x_dir=(1, 0, 0), z_dir=(0, 1, 0))):
        with Locations((-30.939030674505787, -69.02052568564145)):
            Rectangle(SKETCH9_W, SKETCH9_H)
        Polygon((-32.84403067450579, -75.91841359803416), (-32.84403067450579, -79.72841359803415), (0.17596932549421496, -79.72841359803415), (0.17596932549421165, -75.91841359803415), (-3.6340306745057873, -75.91841359803415), (-29.034030674505786, -75.91841359803416), align=None)
        Polygon((-3.6340306745057873, -75.91841359803415), (0.17596932549421496, -75.91841359803415), (0.17596932549421296, -62.122637773248734), (-3.6340306745057855, -62.122637773248734), align=None)
    extrude(amount=BOSS_EXTRUDE5_DEPTH)

    # Pushrod Str
    pushrod_str_edges = [part.edges().sort_by_distance(p)[0] for p in [
        (-3.6340306745057873, 49.2, 75.91841359803415),
        (-29.034030674505786, 49.2, 75.91841359803416),
    ]]
    fillet(pushrod_str_edges, radius=PUSHROD_STR_R)

    # Sketch10 → Pushrod Holes (cut, through all)
    with BuildSketch(Plane.ZY.offset(32.84403067450579)):
        with Locations((71.53649337653819, 49.199999999999996)):
            Circle(SKETCH10_R)
    extrude(amount=-PUSHROD_HOLES_DEPTH, mode=Mode.SUBTRACT)

    # Sketch11 → Tab Holes 3 (cut)
    with BuildSketch(Plane(origin=(0, 0, 79.72841359803415), x_dir=(-1, 0, 0), z_dir=(0, 0, -1))):
        with Locations(Location((-33.93932245419098, 52.73999996799999, 0), (0, 0, 180))):
            Circle(SKETCH11_R)
    extrude(amount=TAB_HOLES_3_DEPTH, mode=Mode.SUBTRACT)


solid = part.part
